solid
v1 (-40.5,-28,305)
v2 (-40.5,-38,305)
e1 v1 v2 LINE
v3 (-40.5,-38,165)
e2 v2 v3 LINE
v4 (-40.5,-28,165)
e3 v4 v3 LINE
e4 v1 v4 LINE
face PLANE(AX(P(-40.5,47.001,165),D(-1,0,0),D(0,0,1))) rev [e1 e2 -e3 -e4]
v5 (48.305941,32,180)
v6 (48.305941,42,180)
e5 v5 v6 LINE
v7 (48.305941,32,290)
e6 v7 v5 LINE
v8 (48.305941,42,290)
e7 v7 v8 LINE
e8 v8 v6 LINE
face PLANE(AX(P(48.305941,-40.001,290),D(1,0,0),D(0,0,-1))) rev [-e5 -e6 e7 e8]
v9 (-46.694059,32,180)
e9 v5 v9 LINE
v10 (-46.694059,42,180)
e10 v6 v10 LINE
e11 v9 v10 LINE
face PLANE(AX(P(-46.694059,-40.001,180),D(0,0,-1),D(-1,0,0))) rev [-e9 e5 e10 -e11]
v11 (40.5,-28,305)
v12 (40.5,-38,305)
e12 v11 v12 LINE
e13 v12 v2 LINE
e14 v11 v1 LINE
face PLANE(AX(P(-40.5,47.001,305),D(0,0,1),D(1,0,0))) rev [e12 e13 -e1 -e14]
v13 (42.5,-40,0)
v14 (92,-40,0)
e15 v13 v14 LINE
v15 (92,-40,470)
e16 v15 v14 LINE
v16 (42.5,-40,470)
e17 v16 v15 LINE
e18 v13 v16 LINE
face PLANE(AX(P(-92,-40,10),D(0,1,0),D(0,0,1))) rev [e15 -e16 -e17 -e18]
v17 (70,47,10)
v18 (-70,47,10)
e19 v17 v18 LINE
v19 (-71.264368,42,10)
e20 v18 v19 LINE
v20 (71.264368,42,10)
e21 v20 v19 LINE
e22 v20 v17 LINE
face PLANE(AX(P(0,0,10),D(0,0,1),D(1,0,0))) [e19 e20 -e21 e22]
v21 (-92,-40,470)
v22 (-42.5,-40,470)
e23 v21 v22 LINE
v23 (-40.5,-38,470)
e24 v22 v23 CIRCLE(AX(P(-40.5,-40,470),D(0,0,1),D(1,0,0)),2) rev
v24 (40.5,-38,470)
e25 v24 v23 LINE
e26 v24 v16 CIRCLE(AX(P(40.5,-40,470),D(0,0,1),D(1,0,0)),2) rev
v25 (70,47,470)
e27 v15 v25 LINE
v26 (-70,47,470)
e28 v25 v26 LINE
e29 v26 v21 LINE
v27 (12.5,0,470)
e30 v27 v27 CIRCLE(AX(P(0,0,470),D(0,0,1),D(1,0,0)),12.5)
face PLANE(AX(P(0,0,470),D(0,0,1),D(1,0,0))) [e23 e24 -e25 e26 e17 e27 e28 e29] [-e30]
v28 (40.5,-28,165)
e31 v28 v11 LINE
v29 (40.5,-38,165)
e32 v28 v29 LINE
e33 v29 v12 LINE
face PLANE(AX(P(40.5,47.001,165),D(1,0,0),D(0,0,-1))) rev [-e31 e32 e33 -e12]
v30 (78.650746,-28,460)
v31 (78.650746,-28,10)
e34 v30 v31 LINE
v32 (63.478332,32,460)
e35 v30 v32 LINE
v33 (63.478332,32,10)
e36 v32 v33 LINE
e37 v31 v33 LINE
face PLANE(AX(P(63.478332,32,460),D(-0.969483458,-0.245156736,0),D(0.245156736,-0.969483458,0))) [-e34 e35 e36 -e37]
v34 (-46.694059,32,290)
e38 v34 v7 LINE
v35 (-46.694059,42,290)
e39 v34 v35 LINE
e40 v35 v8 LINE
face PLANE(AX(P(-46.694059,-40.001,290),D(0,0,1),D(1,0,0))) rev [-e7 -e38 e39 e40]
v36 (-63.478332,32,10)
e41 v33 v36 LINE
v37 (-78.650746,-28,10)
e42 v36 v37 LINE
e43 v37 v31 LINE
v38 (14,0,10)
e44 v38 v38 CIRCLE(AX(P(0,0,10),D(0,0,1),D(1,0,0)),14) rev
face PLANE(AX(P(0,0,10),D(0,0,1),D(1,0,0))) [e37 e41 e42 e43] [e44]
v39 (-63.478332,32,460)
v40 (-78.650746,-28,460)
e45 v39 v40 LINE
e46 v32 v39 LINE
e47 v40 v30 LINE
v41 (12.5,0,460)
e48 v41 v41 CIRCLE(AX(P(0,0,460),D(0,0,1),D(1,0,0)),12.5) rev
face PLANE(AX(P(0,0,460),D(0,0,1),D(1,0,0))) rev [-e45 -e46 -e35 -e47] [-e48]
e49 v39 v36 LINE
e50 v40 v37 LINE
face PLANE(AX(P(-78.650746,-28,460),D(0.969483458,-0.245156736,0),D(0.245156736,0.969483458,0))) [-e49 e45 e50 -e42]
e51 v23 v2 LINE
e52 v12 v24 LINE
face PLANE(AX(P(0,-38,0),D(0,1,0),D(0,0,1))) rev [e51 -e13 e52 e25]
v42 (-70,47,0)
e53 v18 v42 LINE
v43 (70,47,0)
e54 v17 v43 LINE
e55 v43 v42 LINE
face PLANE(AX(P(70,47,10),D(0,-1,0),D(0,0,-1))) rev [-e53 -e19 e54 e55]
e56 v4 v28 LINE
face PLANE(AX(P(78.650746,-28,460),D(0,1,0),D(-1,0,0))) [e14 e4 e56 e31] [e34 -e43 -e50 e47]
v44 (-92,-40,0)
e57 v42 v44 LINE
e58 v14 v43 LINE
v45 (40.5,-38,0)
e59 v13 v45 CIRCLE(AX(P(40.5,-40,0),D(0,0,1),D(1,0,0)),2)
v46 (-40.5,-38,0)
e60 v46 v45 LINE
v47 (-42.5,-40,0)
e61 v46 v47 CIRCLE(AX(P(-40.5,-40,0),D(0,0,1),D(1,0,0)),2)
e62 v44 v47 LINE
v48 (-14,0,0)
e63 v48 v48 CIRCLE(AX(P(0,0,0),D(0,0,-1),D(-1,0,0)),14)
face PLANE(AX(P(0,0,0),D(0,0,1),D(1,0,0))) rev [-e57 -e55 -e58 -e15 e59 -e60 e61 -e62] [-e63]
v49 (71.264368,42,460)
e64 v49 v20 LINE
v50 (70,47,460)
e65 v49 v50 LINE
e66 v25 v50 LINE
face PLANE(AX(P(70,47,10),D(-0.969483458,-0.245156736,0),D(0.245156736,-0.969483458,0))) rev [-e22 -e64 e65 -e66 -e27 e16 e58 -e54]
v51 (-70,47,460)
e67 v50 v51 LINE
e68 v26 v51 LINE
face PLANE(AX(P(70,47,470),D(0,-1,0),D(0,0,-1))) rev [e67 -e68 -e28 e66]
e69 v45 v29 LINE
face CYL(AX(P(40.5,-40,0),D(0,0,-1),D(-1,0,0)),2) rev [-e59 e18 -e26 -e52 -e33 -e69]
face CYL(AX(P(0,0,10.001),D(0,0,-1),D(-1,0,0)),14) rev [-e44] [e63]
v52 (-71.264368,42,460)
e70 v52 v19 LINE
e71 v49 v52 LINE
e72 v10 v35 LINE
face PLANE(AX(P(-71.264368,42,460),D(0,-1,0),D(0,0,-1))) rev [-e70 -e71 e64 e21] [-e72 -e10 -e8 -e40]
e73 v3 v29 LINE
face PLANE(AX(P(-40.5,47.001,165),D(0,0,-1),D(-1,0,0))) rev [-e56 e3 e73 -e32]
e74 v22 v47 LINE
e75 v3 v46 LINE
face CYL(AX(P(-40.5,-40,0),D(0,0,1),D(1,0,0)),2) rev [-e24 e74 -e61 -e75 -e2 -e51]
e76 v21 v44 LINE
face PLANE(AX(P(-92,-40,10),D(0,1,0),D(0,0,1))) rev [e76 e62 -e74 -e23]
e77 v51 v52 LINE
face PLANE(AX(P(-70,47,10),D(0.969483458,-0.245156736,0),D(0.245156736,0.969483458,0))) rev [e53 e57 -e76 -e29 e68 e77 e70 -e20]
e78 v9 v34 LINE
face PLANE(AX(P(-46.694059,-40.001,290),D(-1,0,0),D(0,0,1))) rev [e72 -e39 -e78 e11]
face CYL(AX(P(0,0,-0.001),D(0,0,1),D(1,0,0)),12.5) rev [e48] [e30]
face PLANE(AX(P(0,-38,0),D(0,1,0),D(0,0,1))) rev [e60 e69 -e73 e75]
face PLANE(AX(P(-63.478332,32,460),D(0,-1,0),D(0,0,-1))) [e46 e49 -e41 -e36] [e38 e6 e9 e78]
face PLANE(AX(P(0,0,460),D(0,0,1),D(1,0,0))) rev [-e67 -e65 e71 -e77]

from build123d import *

# Parameters (mm, degrees)
DODANIE_WYCI_GNI_CIE1_DEPTH = 10
WYTNIJ_WYCI_GNI_CIE1_REACH  = 105.793
SZKIC2_R                    = 14
DODANIE_WYCI_GNI_CIE2_DEPTH = 450
DODANIE_WYCI_GNI_CIE3_DEPTH = 10
WYTNIJ_WYCI_GNI_CIE2_REACH  = 483.22
SZKIC5_R                    = 12.5
SZKIC7_W                    = 85
SZKIC7_H                    = 470
WYTNIJ_WYCI_GNI_CIE3_DEPTH  = 2
ZAOKR_GLENIE1_R             = 2
WYTNIJ_WYCI_GNI_CIE4_REACH  = 488.404
SZKIC8_W                    = 81
SZKIC8_H                    = 140
WYTNIJ_WYCI_GNI_CIE5_REACH  = 487.889
SZKIC9_W                    = 95
SZKIC9_H                    = 110


with BuildPart() as part:
    # Szkic1 → Dodanie-wyciągnięcie1 (new body)
    with BuildSketch(Plane.XY):
        Polygon((70, 47), (-70, 47), (-92, -40), (92, -40), align=None)
    extrude(amount=DODANIE_WYCI_GNI_CIE1_DEPTH)

    # Szkic2 → Wytnij-wyciągnięcie1 (cut, up to next)
    with BuildSketch(Plane(origin=(0, 0, 0), x_dir=(-1, 0, 0), z_dir=(0, 0, -1)), mode=Mode.PRIVATE) as wytnij_wyci_gni_cie1_sk1:
        Circle(SZKIC2_R)
    wytnij_wyci_gni_cie1_tool1 = extrude(wytnij_wyci_gni_cie1_sk1.sketch, amount=-WYTNIJ_WYCI_GNI_CIE1_REACH, mode=Mode.PRIVATE) & part.part
    add(wytnij_wyci_gni_cie1_tool1.solids().sort_by_distance((0, 0, 0))[0], mode=Mode.SUBTRACT)

    # Szkic3 → Dodanie-wyciągnięcie2 (add)
    with BuildSketch(Plane.XY.offset(10)):
        Polygon((-71.264367816, 42), (71.264367816, 42), (92, -40), (-92, -40), align=None)
        Polygon((-63.478332297, 32), (63.478332297, 32), (78.65074609, -28), (-78.65074609, -28), align=None, mode=Mode.SUBTRACT)
    extrude(amount=DODANIE_WYCI_GNI_CIE2_DEPTH)

    # Szkic4 → Dodanie-wyciągnięcie3 (add)
    with BuildSketch(Plane.XY.offset(460)):
        Polygon((-70, 47), (-92, -40), (92, -40), (70, 47), align=None)
    extrude(amount=DODANIE_WYCI_GNI_CIE3_DEPTH)

    # Szkic5 → Wytnij-wyciągnięcie2 (cut, up to next)
    with BuildSketch(Plane.XY.offset(470), mode=Mode.PRIVATE) as wytnij_wyci_gni_cie2_sk1:
        Circle(SZKIC5_R)
    wytnij_wyci_gni_cie2_tool1 = extrude(wytnij_wyci_gni_cie2_sk1.sketch, amount=-WYTNIJ_WYCI_GNI_CIE2_REACH, mode=Mode.PRIVATE) & part.part
    add(wytnij_wyci_gni_cie2_tool1.solids().sort_by_distance((0, 0, 470))[0], mode=Mode.SUBTRACT)

    # Szkic7 → Wytnij-wyciągnięcie3 (cut)
    with BuildSketch(Plane.XZ.offset(40)):
        with Locations((0, 235)):
            Rectangle(SZKIC7_W, SZKIC7_H)
    extrude(amount=-WYTNIJ_WYCI_GNI_CIE3_DEPTH, mode=Mode.SUBTRACT)

    # Zaokrąglenie1
    zaokr_glenie1_edges = [part.edges().sort_by_distance(p)[0] for p in [
        (42.5, -38, 235),
        (-42.5, -38, 235),
    ]]
    fillet(zaokr_glenie1_edges, radius=ZAOKR_GLENIE1_R - 0.0001)  # a hair under: the kernel refuses the full size

    # Szkic8 → Wytnij-wyciągnięcie4 (cut, up to next)
    with BuildSketch(Plane.XZ.offset(38), mode=Mode.PRIVATE) as wytnij_wyci_gni_cie4_sk1:
        with Locations((0, 235)):
            Rectangle(SZKIC8_W, SZKIC8_H)
    wytnij_wyci_gni_cie4_tool1 = extrude(wytnij_wyci_gni_cie4_sk1.sketch, amount=-WYTNIJ_WYCI_GNI_CIE4_REACH, mode=Mode.PRIVATE) & part.part
    add(wytnij_wyci_gni_cie4_tool1.solids().sort_by_distance((0, -38, 235))[0], mode=Mode.SUBTRACT)

    # Szkic9 → Wytnij-wyciągnięcie5 (cut, up to next)
    with BuildSketch(Plane(origin=(0, 42, 0), x_dir=(1, 0, 0), z_dir=(0, 1, 0)), mode=Mode.PRIVATE) as wytnij_wyci_gni_cie5_sk1:
        with Locations((0.805940964, -235)):
            Rectangle(SZKIC9_W, SZKIC9_H)
    wytnij_wyci_gni_cie5_tool1 = extrude(wytnij_wyci_gni_cie5_sk1.sketch, amount=-WYTNIJ_WYCI_GNI_CIE5_REACH, mode=Mode.PRIVATE) & part.part
    add(wytnij_wyci_gni_cie5_tool1.solids().sort_by_distance((0.805941, 42, 235))[0], mode=Mode.SUBTRACT)


solid = part.part
